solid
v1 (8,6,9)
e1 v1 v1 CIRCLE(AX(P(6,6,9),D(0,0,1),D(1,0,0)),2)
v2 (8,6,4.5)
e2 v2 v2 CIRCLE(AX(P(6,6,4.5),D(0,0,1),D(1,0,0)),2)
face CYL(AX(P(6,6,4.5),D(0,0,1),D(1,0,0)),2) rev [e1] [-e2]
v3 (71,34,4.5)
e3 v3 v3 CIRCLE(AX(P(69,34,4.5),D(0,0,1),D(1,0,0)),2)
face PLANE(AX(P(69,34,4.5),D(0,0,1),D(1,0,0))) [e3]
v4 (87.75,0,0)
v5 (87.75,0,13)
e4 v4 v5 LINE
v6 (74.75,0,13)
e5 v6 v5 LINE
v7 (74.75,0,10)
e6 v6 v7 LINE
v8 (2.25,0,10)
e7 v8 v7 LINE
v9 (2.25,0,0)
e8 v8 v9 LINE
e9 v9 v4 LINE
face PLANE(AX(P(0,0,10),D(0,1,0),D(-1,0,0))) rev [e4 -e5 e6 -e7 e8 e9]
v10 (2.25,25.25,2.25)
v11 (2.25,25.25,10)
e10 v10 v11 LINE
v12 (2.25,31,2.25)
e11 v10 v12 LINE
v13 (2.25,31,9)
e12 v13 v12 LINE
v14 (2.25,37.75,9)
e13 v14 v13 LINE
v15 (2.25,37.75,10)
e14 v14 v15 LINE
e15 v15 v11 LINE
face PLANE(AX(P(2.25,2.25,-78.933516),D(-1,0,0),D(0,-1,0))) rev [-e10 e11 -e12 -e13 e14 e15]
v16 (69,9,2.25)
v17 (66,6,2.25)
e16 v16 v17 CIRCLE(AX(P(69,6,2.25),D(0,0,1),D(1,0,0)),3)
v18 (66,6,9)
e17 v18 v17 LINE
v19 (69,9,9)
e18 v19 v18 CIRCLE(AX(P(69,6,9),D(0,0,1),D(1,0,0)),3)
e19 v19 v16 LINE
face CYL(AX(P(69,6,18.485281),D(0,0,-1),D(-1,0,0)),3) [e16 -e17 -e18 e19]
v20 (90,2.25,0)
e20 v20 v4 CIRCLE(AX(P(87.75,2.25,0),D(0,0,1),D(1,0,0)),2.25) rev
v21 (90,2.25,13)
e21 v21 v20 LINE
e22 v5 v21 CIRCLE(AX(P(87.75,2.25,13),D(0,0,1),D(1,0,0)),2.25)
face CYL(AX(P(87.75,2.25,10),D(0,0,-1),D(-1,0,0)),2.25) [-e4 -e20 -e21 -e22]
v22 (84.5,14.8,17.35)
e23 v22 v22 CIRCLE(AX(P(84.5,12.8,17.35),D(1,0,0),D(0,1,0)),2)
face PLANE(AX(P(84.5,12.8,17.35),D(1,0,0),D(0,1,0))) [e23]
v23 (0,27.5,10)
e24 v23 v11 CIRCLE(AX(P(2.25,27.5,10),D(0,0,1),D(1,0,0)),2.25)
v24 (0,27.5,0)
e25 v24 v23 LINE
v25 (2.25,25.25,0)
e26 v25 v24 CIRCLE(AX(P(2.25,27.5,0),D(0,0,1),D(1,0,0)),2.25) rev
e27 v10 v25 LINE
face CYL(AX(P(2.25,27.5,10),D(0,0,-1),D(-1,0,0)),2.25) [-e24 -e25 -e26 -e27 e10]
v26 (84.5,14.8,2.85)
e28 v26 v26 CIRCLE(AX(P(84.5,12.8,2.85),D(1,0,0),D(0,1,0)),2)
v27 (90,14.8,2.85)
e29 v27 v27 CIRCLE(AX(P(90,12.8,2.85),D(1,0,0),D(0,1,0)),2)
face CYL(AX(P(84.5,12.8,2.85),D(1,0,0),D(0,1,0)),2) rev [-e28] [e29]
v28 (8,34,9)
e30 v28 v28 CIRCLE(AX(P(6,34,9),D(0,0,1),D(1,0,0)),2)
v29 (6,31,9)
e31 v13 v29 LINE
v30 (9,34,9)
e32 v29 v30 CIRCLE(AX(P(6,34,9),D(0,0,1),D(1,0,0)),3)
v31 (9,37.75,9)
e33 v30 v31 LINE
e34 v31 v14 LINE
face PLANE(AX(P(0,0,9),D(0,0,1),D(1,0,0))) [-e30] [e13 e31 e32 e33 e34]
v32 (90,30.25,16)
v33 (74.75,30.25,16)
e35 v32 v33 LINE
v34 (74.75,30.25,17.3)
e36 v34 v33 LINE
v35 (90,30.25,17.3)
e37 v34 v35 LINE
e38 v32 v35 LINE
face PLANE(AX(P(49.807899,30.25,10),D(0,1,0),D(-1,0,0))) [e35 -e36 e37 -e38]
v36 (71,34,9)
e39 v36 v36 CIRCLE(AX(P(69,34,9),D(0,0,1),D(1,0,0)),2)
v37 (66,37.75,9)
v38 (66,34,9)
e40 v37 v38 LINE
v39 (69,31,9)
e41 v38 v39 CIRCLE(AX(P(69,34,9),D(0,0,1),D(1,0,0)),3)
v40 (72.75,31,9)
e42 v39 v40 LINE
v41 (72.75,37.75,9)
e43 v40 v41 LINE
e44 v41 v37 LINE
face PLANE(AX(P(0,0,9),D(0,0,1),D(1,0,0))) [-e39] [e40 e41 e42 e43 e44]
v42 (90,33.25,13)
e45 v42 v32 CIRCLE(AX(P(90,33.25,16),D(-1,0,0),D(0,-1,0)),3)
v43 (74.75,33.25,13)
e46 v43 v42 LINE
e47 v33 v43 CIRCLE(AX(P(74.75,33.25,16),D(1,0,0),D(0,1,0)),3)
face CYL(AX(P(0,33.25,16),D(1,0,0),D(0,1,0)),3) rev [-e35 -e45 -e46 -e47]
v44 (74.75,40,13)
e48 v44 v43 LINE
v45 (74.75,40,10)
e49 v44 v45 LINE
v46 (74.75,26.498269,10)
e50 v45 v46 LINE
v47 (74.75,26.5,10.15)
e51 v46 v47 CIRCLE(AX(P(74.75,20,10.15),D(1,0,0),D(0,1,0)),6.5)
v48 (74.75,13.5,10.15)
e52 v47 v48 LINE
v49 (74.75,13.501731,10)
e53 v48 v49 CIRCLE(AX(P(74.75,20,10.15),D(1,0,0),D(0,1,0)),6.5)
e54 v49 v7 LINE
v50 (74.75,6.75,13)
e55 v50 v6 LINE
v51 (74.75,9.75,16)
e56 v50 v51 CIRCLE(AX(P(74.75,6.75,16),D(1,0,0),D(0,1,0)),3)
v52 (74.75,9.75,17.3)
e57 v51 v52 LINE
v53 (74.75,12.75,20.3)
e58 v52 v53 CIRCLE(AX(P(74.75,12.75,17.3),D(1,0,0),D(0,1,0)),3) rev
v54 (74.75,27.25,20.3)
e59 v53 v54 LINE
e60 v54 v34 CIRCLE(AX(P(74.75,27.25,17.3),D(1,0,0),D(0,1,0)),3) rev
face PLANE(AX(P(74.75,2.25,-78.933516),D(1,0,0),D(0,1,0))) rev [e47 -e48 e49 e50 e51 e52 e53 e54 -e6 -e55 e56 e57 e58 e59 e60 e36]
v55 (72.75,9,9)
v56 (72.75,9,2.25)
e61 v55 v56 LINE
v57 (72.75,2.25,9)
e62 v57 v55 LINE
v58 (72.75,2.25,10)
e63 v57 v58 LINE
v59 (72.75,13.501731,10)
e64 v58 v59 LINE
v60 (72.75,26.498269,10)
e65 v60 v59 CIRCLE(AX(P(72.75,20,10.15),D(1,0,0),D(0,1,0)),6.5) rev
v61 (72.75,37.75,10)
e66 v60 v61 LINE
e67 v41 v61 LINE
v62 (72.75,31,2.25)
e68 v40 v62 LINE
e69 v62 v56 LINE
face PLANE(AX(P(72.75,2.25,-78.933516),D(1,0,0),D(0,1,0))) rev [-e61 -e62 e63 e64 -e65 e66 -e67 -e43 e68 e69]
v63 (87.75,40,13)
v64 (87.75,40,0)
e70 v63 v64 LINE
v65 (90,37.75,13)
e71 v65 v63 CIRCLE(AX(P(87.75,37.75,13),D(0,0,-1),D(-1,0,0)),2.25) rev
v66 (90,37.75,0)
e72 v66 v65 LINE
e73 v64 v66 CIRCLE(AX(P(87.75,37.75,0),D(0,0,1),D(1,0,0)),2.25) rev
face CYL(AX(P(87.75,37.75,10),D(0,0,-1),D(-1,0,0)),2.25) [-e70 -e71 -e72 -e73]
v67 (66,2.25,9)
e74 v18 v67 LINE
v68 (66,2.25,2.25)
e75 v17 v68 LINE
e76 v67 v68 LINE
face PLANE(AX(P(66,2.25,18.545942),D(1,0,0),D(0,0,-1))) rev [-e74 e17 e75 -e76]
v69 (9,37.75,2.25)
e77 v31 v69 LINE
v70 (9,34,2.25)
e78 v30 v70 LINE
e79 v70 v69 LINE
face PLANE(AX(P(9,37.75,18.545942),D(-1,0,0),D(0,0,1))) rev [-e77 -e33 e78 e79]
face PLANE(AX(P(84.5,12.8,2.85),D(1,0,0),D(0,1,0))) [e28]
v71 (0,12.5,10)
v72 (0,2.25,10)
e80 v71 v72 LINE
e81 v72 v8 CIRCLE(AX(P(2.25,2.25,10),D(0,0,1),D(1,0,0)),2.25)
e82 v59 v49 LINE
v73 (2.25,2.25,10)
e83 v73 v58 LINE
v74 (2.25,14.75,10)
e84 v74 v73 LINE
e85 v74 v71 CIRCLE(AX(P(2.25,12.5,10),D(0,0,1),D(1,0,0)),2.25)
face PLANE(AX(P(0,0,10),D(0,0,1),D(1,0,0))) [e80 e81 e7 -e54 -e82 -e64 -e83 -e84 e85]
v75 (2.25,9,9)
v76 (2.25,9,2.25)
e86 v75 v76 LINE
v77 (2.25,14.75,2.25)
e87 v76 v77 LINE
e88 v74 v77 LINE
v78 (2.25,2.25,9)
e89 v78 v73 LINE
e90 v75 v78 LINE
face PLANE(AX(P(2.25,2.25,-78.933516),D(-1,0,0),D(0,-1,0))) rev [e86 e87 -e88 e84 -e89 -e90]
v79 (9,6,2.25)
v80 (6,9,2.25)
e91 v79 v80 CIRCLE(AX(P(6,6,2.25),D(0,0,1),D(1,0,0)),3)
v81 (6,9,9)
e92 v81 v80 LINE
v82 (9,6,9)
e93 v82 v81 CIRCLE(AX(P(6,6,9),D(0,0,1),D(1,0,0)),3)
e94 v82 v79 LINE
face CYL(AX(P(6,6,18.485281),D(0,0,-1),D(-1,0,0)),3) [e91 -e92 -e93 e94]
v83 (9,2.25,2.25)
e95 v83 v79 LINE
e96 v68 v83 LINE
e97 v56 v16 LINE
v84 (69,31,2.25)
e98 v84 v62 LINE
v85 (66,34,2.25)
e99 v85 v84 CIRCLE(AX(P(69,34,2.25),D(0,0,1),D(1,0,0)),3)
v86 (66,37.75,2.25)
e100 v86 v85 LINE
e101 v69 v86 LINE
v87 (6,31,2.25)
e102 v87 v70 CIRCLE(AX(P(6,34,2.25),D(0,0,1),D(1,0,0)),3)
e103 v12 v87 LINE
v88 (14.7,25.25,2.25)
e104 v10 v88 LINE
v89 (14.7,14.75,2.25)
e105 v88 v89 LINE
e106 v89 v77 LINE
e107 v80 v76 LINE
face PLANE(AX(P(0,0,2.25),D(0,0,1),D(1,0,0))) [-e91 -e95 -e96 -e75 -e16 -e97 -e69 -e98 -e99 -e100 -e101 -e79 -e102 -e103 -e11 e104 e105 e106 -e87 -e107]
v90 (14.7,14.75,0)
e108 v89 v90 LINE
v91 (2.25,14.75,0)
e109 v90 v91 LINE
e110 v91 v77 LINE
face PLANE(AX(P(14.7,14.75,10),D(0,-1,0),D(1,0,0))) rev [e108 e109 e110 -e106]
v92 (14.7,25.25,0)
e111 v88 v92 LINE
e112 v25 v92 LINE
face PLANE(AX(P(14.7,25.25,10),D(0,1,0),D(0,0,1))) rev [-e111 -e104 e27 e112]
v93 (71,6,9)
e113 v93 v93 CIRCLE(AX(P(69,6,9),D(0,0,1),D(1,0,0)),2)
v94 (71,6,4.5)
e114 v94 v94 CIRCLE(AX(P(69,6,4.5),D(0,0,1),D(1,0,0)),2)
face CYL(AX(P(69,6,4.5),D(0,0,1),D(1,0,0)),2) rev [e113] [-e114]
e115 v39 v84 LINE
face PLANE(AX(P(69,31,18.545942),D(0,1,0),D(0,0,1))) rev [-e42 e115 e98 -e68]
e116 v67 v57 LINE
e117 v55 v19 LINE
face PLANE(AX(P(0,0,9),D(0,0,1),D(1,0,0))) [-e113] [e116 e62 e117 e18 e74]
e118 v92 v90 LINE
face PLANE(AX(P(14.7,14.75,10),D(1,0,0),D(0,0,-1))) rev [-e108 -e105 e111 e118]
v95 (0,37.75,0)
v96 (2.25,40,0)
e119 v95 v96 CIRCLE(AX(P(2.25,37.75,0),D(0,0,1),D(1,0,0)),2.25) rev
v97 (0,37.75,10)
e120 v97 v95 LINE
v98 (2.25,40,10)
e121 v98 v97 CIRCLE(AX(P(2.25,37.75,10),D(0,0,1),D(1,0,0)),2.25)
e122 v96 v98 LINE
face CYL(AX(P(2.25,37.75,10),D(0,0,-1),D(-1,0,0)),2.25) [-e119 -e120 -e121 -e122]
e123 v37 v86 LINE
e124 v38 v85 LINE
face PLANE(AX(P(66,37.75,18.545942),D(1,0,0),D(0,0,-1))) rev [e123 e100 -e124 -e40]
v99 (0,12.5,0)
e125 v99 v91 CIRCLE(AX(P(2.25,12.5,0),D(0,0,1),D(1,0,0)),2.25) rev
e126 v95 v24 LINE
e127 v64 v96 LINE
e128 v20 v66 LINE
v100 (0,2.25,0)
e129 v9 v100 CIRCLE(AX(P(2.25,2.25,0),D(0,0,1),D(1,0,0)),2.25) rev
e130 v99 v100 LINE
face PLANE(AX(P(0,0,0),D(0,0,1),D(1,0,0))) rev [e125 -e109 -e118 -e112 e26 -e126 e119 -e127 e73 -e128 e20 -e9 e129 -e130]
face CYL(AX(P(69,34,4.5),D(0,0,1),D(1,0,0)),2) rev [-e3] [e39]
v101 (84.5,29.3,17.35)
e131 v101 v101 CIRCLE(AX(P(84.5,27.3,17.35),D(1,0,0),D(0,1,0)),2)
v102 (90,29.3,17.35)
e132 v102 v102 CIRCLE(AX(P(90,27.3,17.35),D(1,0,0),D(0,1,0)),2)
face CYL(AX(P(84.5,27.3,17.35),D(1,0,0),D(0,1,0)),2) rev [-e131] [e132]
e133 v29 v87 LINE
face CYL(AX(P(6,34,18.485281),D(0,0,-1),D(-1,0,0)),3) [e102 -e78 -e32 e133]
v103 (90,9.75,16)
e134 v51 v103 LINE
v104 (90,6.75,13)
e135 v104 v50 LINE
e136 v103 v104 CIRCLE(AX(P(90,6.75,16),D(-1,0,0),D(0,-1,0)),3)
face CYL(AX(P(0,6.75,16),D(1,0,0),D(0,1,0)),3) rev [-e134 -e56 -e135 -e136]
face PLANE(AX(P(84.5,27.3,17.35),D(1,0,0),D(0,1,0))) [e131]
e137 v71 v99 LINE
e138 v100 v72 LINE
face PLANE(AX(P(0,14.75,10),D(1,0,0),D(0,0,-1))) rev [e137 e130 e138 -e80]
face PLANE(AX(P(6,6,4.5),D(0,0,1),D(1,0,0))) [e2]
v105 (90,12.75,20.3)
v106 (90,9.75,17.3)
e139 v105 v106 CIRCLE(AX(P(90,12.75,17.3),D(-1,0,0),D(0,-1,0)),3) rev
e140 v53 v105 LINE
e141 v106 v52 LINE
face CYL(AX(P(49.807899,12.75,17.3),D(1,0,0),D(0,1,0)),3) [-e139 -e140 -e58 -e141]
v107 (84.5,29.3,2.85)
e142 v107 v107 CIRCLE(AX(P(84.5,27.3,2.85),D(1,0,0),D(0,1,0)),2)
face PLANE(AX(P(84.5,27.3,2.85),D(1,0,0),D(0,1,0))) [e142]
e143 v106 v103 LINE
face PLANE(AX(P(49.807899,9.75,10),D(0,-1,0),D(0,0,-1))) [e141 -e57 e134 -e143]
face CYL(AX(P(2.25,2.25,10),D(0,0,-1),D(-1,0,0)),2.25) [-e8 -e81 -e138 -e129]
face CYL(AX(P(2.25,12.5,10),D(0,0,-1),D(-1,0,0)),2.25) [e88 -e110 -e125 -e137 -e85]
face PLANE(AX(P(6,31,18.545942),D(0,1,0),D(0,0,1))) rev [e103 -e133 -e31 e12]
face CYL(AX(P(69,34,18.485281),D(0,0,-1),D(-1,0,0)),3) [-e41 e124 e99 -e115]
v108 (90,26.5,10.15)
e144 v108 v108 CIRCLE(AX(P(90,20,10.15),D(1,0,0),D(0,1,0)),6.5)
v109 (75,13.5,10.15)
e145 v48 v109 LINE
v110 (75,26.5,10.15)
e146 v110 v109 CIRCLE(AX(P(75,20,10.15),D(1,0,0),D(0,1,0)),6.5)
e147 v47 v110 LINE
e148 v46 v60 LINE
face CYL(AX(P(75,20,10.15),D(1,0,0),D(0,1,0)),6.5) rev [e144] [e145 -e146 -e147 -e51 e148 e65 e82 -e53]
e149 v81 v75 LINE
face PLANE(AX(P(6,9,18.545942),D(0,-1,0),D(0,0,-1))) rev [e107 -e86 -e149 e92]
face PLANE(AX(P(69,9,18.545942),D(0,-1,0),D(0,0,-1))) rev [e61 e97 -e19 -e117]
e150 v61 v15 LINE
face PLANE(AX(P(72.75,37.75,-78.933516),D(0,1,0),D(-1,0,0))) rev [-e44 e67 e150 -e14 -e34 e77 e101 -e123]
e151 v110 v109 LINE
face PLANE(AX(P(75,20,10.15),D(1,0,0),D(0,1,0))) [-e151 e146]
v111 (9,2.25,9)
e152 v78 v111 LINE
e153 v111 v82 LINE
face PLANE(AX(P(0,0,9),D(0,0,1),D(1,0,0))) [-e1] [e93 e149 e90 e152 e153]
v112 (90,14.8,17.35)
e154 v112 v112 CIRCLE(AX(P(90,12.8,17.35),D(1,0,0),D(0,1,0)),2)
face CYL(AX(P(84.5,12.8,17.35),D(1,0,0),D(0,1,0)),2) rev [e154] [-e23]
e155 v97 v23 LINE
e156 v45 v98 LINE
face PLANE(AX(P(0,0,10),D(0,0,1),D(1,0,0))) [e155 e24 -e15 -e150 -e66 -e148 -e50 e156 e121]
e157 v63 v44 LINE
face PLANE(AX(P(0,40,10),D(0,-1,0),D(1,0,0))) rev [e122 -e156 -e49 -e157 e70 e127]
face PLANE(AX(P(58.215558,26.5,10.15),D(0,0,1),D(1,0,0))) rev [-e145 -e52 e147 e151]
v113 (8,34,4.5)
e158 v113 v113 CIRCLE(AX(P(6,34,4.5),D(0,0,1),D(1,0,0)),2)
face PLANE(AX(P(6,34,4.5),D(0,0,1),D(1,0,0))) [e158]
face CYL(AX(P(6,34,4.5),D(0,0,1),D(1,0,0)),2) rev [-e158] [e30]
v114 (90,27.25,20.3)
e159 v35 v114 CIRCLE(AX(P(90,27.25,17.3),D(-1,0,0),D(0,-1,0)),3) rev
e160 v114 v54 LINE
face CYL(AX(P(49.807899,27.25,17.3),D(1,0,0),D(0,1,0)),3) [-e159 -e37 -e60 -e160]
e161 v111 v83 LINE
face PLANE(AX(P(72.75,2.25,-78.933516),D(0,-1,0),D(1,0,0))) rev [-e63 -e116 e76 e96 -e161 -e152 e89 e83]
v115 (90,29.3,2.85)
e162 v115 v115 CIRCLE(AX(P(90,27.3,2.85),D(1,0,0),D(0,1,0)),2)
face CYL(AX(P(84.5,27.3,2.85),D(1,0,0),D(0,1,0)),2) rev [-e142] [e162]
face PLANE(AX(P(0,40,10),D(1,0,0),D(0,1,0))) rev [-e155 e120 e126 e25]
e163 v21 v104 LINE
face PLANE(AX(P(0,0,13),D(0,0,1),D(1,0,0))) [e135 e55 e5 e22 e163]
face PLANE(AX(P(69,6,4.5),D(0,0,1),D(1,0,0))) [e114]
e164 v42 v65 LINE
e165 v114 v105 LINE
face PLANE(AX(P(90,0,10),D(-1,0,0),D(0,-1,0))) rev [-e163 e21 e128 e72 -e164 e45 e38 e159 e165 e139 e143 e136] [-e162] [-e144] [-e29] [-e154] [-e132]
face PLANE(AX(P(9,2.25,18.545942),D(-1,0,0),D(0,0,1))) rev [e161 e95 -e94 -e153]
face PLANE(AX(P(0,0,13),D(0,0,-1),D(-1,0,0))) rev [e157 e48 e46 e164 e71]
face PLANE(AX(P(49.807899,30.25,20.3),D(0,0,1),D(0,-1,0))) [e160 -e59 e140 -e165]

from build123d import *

# Parameters (mm, degrees)
BODY_DEPTH          = 10
PCB_RECESS_DEPTH    = 7.75
SKETCH11_R          = 3.000000000000004
SKETCH11_R_2        = 3.0000000000000084
SKETCH11_R_3        = 3.000000000000008
SKETCH11_R_4        = 2.999999999999999
PCB_BOSS_DEPTH      = 6.75
FILLET2_R           = 2.25
BOSS_EXTRUDE2_DEPTH = 15.25
SKETCH24_W          = 15.25
SKETCH24_H          = 9.74999999999999
SKETCH24_W_2        = 15.249999999999972
SKETCH24_H_2        = 9.750000000000002
BOSS_EXTRUDE3_DEPTH = 3
SKETCH25_R          = 6.5
CUT_EXTRUDE9_DEPTH  = 15
CUT_EXTRUDE10_DEPTH = 2.25
FILLET7_R           = 3
FILLET8_R           = 2.25
SKETCH27_R          = 2.0000000000000067
SKETCH27_R_2        = 2.000000000000003
SKETCH27_R_3        = 2
SKETCH27_R_4        = 1.9999999999999996
CUT_EXTRUDE11_DEPTH = 5.5
BOSS_EXTRUDE4_DEPTH = 6.75
SKETCH12_R          = 1.9999999999999991
SKETCH12_R_2        = 1.9999999999999967
SKETCH12_R_3        = 1.9999999999999996
CUT_EXTRUDE5_DEPTH  = 4.5


with BuildPart() as part:
    # Sketch4 → body (new body)
    with BuildSketch(Plane.XY):
        Polygon((0, 40), (1.73e-15, 25.25), (14.7, 25.25), (14.7, 14.750000000000002), (0, 14.75), (0, 0), (89.99999999999999, -6.94e-15), (90, 39.99999999999999), align=None)
    extrude(amount=BODY_DEPTH)

    # Sketch10 → pcb-recess (cut)
    with BuildSketch(Plane.XY.offset(10)):
        Polygon((72.75000000000001, 2.250000000000009), (2.2500000000000018, 2.2500000000000004), (2.2500000000000044, 37.74999999999999), (72.75, 37.75000000000001), align=None)
    extrude(amount=-PCB_RECESS_DEPTH, mode=Mode.SUBTRACT)

    # Sketch11 → pcb-boss (add)
    with BuildSketch(Plane.XY.offset(2.25)):
        with Locations((6.000000000000004, 34)):
            Circle(SKETCH11_R)
        with Locations((69, 34)):
            Circle(SKETCH11_R_2)
        with Locations((69, 6.000000000000005)):
            Circle(SKETCH11_R_3)
        with Locations((6.000000000000007, 6.000000000000005)):
            Circle(SKETCH11_R_4)
    extrude(amount=PCB_BOSS_DEPTH)

    # Fillet2
    fillet2_edges = [part.edges().sort_by_distance(p)[0] for p in [
        (0, 14.75, 5),
        (1.73e-15, 25.25, 5),
    ]]
    fillet(fillet2_edges, radius=FILLET2_R - 0.0001)  # a hair under: the kernel refuses the full size

    # Sketch23 → Boss-Extrude2 (add)
    with BuildSketch(Plane(origin=(89.99999999999999, -3.123e-14, 0), x_dir=(0, 0, -1), z_dir=(1, -3.5e-16, 0))):
        Polygon((-10, 30.250000000000025), (-20.299999999999997, 30.25000000000003), (-20.299999999999994, 9.750000000000027), (-9.999999999999998, 9.75000000000002), align=None)
    extrude(amount=-BOSS_EXTRUDE2_DEPTH)

    # Sketch24 → Boss-Extrude3 (add)
    with BuildSketch(Plane.XY.offset(10)):
        with Locations((82.375, 35.125)):
            Rectangle(SKETCH24_W, SKETCH24_H)
        with Locations((82.375, 4.874999999999994)):
            Rectangle(SKETCH24_W_2, SKETCH24_H_2)
    extrude(amount=BOSS_EXTRUDE3_DEPTH)

    # Sketch25 → Cut-Extrude9 (cut)
    with BuildSketch(Plane(origin=(89.99999999999999, -3.123e-14, 0), x_dir=(0, 0, -1), z_dir=(1, -3.5e-16, 0))):
        with Locations(Location((-10.149999999999999, 20.000000000000025, 0), (0, 0, 90))):
            Circle(SKETCH25_R)
    extrude(amount=-CUT_EXTRUDE9_DEPTH, mode=Mode.SUBTRACT)

    # Sketch26 → Cut-Extrude10 (cut)
    with BuildSketch(Plane(origin=(75, -2.602e-14, 0), x_dir=(0, 0, -1), z_dir=(1, -3.5e-16, 0))):
        with BuildLine():
            Line((-10.149999999999999, 26.500000000000025), (-10.149999999999999, 13.500000000000027))
            ThreePointArc((-10.149999999999999, 13.500000000000027), (-3.6499999999999986, 20.000000000000025), (-10.149999999999999, 26.500000000000025))
        make_face()
    extrude(amount=-CUT_EXTRUDE10_DEPTH, mode=Mode.SUBTRACT)

    # Fillet7
    fillet7_edges = [part.edges().sort_by_distance(p)[0] for p in [
        (82.375, 9.749999999999995, 13),
        (82.37499999999999, 9.749999999999996, 20.299999999999994),
        (82.375, 30.25, 20.299999999999997),
        (82.375, 30.25, 13),
    ]]
    fillet(fillet7_edges, radius=FILLET7_R)

    # Fillet8
    fillet8_edges = [part.edges().sort_by_distance(p)[0] for p in [
        (0, 40, 5),
        (90, 39.99999999999999, 6.5),
        (89.99999999999999, -6.94e-15, 6.5),
        (0, 0, 5),
    ]]
    fillet(fillet8_edges, radius=FILLET8_R)

    # Sketch27 → Cut-Extrude11 (cut)
    with BuildSketch(Plane(origin=(89.99999999999999, -3.123e-14, 0), x_dir=(0, 0, -1), z_dir=(1, -3.5e-16, 0))):
        with Locations(Location((-17.350000000000005, 27.300000000000026, 0), (0, 0, 90))):
            Circle(SKETCH27_R)
        with Locations(Location((-2.850000000000002, 27.300000000000026, 0), (0, 0, 90))):
            Circle(SKETCH27_R_2)
        with Locations(Location((-2.8499999999999948, 12.800000000000026, 0), (0, 0, 90))):
            Circle(SKETCH27_R_3)
        with Locations(Location((-17.349999999999998, 12.800000000000026, 0), (0, 0, 90))):
            Circle(SKETCH27_R_4)
    extrude(amount=-CUT_EXTRUDE11_DEPTH, mode=Mode.SUBTRACT)

    # Sketch28 → Boss-Extrude4 (add)
    with BuildSketch(Plane.XY.offset(2.25)):
        with BuildLine():
            Line((6.000000000000004, 31), (2.2500000000000036, 31))
            Line((2.2500000000000036, 31), (2.2500000000000044, 37.74999999999999))
            Line((2.2500000000000044, 37.74999999999999), (9.000000000000007, 37.74999999999999))
            Line((9.000000000000007, 37.74999999999999), (9.000000000000007, 34))
            ThreePointArc((9.000000000000007, 34), (8.121320343559649, 31.878679656440355), (6.000000000000004, 31))
        make_face()
        with BuildLine():
            Line((65.99999999999999, 37.75000000000001), (65.99999999999999, 34.000000000000014))
            ThreePointArc((65.99999999999999, 34.000000000000014), (66.87867965644034, 31.878679656440372), (68.99999999999999, 31.000000000000014))
            Line((68.99999999999999, 31.000000000000014), (72.75, 31.000000000000014))
            Line((72.75, 31.000000000000014), (72.75, 37.75000000000001))
            Line((72.75, 37.75000000000001), (65.99999999999999, 37.75000000000001))
        make_face()
        with BuildLine():
            Line((68.99999999999999, 8.999999999999988), (72.75, 8.999999999999988))
            Line((72.75, 8.999999999999988), (72.75, 2.249999999999995))
            Line((72.75, 2.249999999999995), (65.99999999999999, 2.249999999999995))
            Line((65.99999999999999, 2.249999999999995), (65.99999999999999, 5.999999999999985))
            ThreePointArc((65.99999999999999, 5.999999999999985), (66.87867965644034, 8.121320343559628), (68.99999999999999, 8.999999999999988))
        make_face()
        with BuildLine():
            Line((9.000000000000007, 2.250000000000009), (9.000000000000007, 5.999999999999998))
            ThreePointArc((9.000000000000007, 5.999999999999998), (8.121320343559649, 8.121320343559642), (6.000000000000004, 9.000000000000002))
            Line((6.000000000000004, 9.000000000000002), (2.2500000000000036, 9.000000000000002))
            Line((2.2500000000000036, 9.000000000000002), (2.2500000000000044, 2.250000000000009))
            Line((2.2500000000000044, 2.250000000000009), (9.000000000000007, 2.250000000000009))
        make_face()
    extrude(amount=BOSS_EXTRUDE4_DEPTH)

    # Sketch12 → Cut-Extrude5 (cut)
    with BuildSketch(Plane.XY.offset(9.000000000000002)):
        with Locations((6.000000000000004, 34)):
            Circle(SKETCH12_R)
        with Locations((69, 34)):
            Circle(SKETCH12_R_2)
        with Locations((69, 6.000000000000005)):
            Circle(SKETCH12_R_2)
        with Locations((6.000000000000007, 6.000000000000005)):
            Circle(SKETCH12_R_3)
    extrude(amount=-CUT_EXTRUDE5_DEPTH, mode=Mode.SUBTRACT)


solid = part.part
